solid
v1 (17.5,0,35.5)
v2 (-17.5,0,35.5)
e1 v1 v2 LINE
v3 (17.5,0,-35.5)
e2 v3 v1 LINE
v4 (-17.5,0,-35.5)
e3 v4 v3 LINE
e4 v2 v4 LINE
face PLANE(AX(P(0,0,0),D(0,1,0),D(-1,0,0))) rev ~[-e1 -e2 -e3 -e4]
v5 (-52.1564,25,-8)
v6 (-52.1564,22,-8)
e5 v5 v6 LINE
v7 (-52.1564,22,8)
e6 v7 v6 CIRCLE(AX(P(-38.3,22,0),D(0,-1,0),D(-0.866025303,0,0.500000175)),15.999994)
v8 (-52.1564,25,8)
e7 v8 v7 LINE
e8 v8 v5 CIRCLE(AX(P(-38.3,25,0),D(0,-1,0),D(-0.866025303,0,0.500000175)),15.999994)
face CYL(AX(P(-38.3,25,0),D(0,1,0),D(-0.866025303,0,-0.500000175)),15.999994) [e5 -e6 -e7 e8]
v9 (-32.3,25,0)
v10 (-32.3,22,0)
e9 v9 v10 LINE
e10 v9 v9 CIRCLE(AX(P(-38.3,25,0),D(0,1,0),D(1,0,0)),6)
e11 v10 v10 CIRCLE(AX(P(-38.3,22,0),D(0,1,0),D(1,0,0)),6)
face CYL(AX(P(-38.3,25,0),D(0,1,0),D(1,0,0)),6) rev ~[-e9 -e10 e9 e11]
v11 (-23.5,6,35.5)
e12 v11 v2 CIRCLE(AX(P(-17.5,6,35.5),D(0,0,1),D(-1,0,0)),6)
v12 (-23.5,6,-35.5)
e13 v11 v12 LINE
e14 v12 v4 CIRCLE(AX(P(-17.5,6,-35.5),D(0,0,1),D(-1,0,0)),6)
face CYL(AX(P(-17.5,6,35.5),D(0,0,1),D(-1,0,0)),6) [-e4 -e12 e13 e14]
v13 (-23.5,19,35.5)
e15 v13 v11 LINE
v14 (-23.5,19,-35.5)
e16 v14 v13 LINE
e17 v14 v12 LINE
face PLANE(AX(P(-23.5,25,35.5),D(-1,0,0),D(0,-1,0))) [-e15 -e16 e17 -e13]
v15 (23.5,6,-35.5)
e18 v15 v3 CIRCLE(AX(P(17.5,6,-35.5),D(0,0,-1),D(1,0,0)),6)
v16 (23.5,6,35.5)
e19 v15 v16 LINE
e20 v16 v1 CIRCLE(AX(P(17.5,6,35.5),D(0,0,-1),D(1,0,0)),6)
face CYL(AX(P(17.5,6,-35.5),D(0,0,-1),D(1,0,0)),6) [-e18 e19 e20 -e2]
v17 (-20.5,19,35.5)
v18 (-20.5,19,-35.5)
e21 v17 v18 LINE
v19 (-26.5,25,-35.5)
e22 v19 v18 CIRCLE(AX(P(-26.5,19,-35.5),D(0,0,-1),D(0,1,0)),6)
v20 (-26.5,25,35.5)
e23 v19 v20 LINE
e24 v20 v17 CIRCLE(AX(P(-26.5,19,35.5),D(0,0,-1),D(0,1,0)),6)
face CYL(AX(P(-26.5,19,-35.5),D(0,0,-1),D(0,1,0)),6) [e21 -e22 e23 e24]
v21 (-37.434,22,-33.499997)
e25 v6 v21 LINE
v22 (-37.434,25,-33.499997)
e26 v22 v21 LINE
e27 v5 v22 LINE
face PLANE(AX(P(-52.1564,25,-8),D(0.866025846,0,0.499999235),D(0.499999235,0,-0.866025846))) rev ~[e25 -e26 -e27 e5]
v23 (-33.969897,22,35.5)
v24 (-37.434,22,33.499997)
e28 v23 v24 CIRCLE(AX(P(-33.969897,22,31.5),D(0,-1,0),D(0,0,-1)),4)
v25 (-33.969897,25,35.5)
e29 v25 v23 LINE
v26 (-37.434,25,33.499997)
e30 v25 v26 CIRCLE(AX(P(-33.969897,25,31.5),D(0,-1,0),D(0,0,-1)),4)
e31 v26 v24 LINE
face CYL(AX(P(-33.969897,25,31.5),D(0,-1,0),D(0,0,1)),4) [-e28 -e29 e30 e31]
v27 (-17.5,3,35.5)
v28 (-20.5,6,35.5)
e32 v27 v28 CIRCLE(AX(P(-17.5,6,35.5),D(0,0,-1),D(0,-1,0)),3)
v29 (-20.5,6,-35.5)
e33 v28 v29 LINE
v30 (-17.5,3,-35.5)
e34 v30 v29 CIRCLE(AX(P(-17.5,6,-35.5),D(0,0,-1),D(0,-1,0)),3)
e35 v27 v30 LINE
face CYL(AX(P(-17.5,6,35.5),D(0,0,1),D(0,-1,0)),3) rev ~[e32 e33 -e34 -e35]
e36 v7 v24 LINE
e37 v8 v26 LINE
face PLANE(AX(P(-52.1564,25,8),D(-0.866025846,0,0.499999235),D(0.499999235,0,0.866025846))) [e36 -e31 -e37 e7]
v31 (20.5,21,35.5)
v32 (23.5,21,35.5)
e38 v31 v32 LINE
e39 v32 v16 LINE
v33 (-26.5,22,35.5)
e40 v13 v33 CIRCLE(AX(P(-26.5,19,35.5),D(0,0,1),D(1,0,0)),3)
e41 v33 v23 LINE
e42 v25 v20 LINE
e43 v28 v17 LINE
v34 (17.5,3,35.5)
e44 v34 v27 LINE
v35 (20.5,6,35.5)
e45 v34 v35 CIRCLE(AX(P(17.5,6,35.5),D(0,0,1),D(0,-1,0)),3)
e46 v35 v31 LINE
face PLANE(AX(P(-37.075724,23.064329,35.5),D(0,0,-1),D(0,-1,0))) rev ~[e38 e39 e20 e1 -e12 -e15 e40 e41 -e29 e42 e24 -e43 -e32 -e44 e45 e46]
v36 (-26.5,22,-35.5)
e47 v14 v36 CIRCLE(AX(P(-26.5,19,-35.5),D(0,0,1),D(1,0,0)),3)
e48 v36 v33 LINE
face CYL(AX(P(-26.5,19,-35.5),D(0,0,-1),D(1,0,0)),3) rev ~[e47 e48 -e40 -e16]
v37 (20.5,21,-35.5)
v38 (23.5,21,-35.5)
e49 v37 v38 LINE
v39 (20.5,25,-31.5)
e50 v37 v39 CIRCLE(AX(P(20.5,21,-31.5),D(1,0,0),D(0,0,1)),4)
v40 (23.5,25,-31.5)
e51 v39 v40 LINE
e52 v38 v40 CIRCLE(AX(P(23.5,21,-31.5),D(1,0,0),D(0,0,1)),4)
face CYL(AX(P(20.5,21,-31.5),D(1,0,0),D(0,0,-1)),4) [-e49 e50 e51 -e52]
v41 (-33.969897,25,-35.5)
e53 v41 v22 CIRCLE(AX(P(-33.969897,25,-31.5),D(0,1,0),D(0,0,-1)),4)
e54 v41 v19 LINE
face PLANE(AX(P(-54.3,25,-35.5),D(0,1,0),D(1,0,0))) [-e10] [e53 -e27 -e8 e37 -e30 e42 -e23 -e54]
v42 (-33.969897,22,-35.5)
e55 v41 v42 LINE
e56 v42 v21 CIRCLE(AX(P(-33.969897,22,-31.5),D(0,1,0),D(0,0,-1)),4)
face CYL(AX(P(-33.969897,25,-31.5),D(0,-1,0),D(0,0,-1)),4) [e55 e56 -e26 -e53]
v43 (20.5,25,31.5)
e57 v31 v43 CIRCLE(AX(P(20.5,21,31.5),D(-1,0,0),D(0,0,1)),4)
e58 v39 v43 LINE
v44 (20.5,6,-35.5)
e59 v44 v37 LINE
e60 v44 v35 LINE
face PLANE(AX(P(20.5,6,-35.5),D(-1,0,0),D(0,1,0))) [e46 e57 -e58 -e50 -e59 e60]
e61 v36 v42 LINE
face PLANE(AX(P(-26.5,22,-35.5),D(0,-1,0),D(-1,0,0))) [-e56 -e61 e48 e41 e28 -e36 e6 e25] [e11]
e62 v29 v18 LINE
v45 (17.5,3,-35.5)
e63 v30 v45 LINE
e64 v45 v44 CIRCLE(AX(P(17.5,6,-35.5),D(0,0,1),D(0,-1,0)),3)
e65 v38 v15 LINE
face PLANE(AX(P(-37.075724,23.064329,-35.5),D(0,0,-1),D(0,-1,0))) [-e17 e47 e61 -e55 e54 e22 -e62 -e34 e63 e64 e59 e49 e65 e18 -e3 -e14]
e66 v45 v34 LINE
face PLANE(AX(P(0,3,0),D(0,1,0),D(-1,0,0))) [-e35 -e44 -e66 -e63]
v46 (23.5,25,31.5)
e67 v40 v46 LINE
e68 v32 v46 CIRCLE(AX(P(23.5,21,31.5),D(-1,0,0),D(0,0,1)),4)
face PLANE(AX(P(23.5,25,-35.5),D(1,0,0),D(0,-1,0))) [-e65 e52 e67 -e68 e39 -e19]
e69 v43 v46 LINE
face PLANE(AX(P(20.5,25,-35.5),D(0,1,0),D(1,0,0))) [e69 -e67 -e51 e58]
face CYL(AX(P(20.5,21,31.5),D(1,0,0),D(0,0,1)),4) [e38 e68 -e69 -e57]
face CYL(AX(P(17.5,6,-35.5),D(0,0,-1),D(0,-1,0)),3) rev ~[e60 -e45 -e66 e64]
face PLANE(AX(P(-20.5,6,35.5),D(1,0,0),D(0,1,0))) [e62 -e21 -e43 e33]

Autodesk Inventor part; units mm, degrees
ref_plane "YZ Plane" through (0, 0, 0) normal (1, 0, 0) x (0, 1, 0)
ref_plane "XZ Plane" through (0, 0, 0) normal (0, 1, 0) x (-1, 0, 0)
ref_plane "XY Plane" through (0, 0, 0) normal (0, 0, 1) x (1, 0, 0)
sketch "Sketch1" plane through (0, 0, 0) normal (0, 1, 0) x (-1, 0, 0)
  line L0 (-20.5, 35.5) -> (20.5, 35.5)
  line L1 (20.5, 35.5) -> (20.5, -35.5)
  line L2 (20.5, -35.5) -> (-20.5, -35.5)
  line L3 (-20.5, -35.5) -> (-20.5, 35.5)
  line L4 (-20.5, 35.5) -> (20.5, -35.5) construction
  line L5 (20.5, 35.5) -> (-20.5, -35.5) construction
  point P0 (0, 0)
  point P1 (0, 0)
  point P2 (0, 0)
  dimension "d0" = 71
  dimension "d1" = 41
extrude "Plate1" add sketch "Sketch1" along normal blind 3
sketch "Sketch2" plane through (20.5, 3, -35.5) normal (1, 0, 0) x (0, 1, 0)
  line L0 (0, 71) -> (0, 0)
  line L1 (0, 0) -> (22, 0)
  line L2 (22, 0) -> (22, 71)
  line L3 (22, 71) -> (0, 71)
edge flange "Flange1" height 22 angle 90 thickness 3 bend radius 3 thickness toward (1, 0, 0) relief tear relief width 3 relief depth 1.5 corner gap 3 corner form 0 edges at (20.5, 3, 0) (-20.5, 3, 0) wall of the first edge with corners at (20.5, 3, 35.5) (20.5, 3, -35.5) (20.5, 25, -35.5) (20.5, 25, 35.5)
bend "Bend1"
corner "Corner1"
sketch "Sketch3" plane through (-20.5, 22, -35.5) normal (0, 1, 0) x (-1, 0, 0)
  line L0 (0, 71) -> (0, 0)
  line L1 (0, 0) -> (33.8, 0)
  line L2 (33.8, 0) -> (33.8, 71)
  line L3 (33.8, 71) -> (0, 71)
edge flange "Flange2" height 33.8 angle 90 thickness 3 bend radius 3 thickness toward (0, 1, 0) relief tear relief width 3 relief depth 1.5 edges at (-23.5, 25, 0) wall of the first edge with corners at (-20.5, 22, 35.5) (-20.5, 22, -35.5) (-54.3, 22, -35.5) (-54.3, 22, 35.5)
bend "Bend2"
corner "Corner2"
sketch "Sketch4" plane through (-54.3, 25, 35.5) normal (0, 1, 0) x (1, 0, 0)
  line L0 (0, 0) -> (28.3, 0)
  line L1 (28.3, 71) -> (0, 71)
  line L2 (0, 0) -> (0, 71)
  line L3 (54.3, 35.5) -> (0, 35.5) construction
  line L4 (2.1436, 27.5) -> (18.0207, 0)
  line L5 (2.1436, 43.5) -> (18.0207, 71)
  arc A0 (2.1436, 43.5) -> (2.1436, 27.5) centre (16, 35.5) ccw
  line L6 (74.8, 71) -> (77.8, 71) projected
  line L7 (74.8, 0) -> (77.8, 0) projected
  point P0 (54.3, 35.5)
  dimension "d23" = 30
  dimension "d24" = 30
  dimension "d25" = 16
  dimension "d26" = 38.3
extrude "Cut1" cut sketch "Sketch4" against normal blind 3
fillet "Fillet1" radius 4 4 edges at (-36.2793, 23.5, 35.5) (-36.2793, 23.5, -35.5) (22, 25, -35.5) (22, 25, 35.5)
sketch "Sketch5" plane through (-26.5, 25, 35.5) normal (0, 1, 0) x (1, 0, 0)
  arc A0 (-25.6564, 43.5) -> (-25.6564, 27.5) centre (-11.8, 35.5) ccw projected
  circle A1 centre (-11.8, 35.5) radius 6
  point P0 (26.5, 35.5)
  dimension "d30" = 12
extrude "Extrusion1" cut sketch "Sketch5" against normal through all
equation "\"d24\" = d23"
equation "\"d27\" = Thickness"
equation "\"d2\" = Thickness"
equation "\"d3\" = BendReliefWidth"
equation "\"d4\" = BendReliefDepth"
equation "\"d5\" = MinimumRemnant"
equation "\"d6\" = TransitionRadius"
equation "\"d9\" = BendRadius"
equation "\"d10\" = CornerReliefSize"
equation "\"d11\" = GapSize"
equation "\"d12\" = JacobiRadiusSize"
equation "\"d13\" = BendReliefWidth"
equation "\"d14\" = BendReliefDepth"
equation "\"d15\" = MinimumRemnant"
equation "\"d16\" = TransitionRadius"
equation "\"d19\" = BendRadius"
equation "\"d20\" = CornerReliefSize"
equation "\"d21\" = GapSize"
equation "\"d22\" = JacobiRadiusSize"
equation "\"BendRadius\" = Thickness"
equation "\"BendReliefWidth\" = Thickness"
equation "\"BendReliefDepth\" = 0.5 * Thickness"
equation "\"CornerReliefSize\" = 4 * Thickness"
equation "\"MinimumRemnant\" = 2 * Thickness"
equation "\"TransitionRadius\" = BendRadius"
equation "\"JacobiRadiusSize\" = BendRadius"
equation "\"GapSize\" = Thickness"
equation "\"Thickness\" = 3"
properties part number "318-02" material "Aluminum 6061"
